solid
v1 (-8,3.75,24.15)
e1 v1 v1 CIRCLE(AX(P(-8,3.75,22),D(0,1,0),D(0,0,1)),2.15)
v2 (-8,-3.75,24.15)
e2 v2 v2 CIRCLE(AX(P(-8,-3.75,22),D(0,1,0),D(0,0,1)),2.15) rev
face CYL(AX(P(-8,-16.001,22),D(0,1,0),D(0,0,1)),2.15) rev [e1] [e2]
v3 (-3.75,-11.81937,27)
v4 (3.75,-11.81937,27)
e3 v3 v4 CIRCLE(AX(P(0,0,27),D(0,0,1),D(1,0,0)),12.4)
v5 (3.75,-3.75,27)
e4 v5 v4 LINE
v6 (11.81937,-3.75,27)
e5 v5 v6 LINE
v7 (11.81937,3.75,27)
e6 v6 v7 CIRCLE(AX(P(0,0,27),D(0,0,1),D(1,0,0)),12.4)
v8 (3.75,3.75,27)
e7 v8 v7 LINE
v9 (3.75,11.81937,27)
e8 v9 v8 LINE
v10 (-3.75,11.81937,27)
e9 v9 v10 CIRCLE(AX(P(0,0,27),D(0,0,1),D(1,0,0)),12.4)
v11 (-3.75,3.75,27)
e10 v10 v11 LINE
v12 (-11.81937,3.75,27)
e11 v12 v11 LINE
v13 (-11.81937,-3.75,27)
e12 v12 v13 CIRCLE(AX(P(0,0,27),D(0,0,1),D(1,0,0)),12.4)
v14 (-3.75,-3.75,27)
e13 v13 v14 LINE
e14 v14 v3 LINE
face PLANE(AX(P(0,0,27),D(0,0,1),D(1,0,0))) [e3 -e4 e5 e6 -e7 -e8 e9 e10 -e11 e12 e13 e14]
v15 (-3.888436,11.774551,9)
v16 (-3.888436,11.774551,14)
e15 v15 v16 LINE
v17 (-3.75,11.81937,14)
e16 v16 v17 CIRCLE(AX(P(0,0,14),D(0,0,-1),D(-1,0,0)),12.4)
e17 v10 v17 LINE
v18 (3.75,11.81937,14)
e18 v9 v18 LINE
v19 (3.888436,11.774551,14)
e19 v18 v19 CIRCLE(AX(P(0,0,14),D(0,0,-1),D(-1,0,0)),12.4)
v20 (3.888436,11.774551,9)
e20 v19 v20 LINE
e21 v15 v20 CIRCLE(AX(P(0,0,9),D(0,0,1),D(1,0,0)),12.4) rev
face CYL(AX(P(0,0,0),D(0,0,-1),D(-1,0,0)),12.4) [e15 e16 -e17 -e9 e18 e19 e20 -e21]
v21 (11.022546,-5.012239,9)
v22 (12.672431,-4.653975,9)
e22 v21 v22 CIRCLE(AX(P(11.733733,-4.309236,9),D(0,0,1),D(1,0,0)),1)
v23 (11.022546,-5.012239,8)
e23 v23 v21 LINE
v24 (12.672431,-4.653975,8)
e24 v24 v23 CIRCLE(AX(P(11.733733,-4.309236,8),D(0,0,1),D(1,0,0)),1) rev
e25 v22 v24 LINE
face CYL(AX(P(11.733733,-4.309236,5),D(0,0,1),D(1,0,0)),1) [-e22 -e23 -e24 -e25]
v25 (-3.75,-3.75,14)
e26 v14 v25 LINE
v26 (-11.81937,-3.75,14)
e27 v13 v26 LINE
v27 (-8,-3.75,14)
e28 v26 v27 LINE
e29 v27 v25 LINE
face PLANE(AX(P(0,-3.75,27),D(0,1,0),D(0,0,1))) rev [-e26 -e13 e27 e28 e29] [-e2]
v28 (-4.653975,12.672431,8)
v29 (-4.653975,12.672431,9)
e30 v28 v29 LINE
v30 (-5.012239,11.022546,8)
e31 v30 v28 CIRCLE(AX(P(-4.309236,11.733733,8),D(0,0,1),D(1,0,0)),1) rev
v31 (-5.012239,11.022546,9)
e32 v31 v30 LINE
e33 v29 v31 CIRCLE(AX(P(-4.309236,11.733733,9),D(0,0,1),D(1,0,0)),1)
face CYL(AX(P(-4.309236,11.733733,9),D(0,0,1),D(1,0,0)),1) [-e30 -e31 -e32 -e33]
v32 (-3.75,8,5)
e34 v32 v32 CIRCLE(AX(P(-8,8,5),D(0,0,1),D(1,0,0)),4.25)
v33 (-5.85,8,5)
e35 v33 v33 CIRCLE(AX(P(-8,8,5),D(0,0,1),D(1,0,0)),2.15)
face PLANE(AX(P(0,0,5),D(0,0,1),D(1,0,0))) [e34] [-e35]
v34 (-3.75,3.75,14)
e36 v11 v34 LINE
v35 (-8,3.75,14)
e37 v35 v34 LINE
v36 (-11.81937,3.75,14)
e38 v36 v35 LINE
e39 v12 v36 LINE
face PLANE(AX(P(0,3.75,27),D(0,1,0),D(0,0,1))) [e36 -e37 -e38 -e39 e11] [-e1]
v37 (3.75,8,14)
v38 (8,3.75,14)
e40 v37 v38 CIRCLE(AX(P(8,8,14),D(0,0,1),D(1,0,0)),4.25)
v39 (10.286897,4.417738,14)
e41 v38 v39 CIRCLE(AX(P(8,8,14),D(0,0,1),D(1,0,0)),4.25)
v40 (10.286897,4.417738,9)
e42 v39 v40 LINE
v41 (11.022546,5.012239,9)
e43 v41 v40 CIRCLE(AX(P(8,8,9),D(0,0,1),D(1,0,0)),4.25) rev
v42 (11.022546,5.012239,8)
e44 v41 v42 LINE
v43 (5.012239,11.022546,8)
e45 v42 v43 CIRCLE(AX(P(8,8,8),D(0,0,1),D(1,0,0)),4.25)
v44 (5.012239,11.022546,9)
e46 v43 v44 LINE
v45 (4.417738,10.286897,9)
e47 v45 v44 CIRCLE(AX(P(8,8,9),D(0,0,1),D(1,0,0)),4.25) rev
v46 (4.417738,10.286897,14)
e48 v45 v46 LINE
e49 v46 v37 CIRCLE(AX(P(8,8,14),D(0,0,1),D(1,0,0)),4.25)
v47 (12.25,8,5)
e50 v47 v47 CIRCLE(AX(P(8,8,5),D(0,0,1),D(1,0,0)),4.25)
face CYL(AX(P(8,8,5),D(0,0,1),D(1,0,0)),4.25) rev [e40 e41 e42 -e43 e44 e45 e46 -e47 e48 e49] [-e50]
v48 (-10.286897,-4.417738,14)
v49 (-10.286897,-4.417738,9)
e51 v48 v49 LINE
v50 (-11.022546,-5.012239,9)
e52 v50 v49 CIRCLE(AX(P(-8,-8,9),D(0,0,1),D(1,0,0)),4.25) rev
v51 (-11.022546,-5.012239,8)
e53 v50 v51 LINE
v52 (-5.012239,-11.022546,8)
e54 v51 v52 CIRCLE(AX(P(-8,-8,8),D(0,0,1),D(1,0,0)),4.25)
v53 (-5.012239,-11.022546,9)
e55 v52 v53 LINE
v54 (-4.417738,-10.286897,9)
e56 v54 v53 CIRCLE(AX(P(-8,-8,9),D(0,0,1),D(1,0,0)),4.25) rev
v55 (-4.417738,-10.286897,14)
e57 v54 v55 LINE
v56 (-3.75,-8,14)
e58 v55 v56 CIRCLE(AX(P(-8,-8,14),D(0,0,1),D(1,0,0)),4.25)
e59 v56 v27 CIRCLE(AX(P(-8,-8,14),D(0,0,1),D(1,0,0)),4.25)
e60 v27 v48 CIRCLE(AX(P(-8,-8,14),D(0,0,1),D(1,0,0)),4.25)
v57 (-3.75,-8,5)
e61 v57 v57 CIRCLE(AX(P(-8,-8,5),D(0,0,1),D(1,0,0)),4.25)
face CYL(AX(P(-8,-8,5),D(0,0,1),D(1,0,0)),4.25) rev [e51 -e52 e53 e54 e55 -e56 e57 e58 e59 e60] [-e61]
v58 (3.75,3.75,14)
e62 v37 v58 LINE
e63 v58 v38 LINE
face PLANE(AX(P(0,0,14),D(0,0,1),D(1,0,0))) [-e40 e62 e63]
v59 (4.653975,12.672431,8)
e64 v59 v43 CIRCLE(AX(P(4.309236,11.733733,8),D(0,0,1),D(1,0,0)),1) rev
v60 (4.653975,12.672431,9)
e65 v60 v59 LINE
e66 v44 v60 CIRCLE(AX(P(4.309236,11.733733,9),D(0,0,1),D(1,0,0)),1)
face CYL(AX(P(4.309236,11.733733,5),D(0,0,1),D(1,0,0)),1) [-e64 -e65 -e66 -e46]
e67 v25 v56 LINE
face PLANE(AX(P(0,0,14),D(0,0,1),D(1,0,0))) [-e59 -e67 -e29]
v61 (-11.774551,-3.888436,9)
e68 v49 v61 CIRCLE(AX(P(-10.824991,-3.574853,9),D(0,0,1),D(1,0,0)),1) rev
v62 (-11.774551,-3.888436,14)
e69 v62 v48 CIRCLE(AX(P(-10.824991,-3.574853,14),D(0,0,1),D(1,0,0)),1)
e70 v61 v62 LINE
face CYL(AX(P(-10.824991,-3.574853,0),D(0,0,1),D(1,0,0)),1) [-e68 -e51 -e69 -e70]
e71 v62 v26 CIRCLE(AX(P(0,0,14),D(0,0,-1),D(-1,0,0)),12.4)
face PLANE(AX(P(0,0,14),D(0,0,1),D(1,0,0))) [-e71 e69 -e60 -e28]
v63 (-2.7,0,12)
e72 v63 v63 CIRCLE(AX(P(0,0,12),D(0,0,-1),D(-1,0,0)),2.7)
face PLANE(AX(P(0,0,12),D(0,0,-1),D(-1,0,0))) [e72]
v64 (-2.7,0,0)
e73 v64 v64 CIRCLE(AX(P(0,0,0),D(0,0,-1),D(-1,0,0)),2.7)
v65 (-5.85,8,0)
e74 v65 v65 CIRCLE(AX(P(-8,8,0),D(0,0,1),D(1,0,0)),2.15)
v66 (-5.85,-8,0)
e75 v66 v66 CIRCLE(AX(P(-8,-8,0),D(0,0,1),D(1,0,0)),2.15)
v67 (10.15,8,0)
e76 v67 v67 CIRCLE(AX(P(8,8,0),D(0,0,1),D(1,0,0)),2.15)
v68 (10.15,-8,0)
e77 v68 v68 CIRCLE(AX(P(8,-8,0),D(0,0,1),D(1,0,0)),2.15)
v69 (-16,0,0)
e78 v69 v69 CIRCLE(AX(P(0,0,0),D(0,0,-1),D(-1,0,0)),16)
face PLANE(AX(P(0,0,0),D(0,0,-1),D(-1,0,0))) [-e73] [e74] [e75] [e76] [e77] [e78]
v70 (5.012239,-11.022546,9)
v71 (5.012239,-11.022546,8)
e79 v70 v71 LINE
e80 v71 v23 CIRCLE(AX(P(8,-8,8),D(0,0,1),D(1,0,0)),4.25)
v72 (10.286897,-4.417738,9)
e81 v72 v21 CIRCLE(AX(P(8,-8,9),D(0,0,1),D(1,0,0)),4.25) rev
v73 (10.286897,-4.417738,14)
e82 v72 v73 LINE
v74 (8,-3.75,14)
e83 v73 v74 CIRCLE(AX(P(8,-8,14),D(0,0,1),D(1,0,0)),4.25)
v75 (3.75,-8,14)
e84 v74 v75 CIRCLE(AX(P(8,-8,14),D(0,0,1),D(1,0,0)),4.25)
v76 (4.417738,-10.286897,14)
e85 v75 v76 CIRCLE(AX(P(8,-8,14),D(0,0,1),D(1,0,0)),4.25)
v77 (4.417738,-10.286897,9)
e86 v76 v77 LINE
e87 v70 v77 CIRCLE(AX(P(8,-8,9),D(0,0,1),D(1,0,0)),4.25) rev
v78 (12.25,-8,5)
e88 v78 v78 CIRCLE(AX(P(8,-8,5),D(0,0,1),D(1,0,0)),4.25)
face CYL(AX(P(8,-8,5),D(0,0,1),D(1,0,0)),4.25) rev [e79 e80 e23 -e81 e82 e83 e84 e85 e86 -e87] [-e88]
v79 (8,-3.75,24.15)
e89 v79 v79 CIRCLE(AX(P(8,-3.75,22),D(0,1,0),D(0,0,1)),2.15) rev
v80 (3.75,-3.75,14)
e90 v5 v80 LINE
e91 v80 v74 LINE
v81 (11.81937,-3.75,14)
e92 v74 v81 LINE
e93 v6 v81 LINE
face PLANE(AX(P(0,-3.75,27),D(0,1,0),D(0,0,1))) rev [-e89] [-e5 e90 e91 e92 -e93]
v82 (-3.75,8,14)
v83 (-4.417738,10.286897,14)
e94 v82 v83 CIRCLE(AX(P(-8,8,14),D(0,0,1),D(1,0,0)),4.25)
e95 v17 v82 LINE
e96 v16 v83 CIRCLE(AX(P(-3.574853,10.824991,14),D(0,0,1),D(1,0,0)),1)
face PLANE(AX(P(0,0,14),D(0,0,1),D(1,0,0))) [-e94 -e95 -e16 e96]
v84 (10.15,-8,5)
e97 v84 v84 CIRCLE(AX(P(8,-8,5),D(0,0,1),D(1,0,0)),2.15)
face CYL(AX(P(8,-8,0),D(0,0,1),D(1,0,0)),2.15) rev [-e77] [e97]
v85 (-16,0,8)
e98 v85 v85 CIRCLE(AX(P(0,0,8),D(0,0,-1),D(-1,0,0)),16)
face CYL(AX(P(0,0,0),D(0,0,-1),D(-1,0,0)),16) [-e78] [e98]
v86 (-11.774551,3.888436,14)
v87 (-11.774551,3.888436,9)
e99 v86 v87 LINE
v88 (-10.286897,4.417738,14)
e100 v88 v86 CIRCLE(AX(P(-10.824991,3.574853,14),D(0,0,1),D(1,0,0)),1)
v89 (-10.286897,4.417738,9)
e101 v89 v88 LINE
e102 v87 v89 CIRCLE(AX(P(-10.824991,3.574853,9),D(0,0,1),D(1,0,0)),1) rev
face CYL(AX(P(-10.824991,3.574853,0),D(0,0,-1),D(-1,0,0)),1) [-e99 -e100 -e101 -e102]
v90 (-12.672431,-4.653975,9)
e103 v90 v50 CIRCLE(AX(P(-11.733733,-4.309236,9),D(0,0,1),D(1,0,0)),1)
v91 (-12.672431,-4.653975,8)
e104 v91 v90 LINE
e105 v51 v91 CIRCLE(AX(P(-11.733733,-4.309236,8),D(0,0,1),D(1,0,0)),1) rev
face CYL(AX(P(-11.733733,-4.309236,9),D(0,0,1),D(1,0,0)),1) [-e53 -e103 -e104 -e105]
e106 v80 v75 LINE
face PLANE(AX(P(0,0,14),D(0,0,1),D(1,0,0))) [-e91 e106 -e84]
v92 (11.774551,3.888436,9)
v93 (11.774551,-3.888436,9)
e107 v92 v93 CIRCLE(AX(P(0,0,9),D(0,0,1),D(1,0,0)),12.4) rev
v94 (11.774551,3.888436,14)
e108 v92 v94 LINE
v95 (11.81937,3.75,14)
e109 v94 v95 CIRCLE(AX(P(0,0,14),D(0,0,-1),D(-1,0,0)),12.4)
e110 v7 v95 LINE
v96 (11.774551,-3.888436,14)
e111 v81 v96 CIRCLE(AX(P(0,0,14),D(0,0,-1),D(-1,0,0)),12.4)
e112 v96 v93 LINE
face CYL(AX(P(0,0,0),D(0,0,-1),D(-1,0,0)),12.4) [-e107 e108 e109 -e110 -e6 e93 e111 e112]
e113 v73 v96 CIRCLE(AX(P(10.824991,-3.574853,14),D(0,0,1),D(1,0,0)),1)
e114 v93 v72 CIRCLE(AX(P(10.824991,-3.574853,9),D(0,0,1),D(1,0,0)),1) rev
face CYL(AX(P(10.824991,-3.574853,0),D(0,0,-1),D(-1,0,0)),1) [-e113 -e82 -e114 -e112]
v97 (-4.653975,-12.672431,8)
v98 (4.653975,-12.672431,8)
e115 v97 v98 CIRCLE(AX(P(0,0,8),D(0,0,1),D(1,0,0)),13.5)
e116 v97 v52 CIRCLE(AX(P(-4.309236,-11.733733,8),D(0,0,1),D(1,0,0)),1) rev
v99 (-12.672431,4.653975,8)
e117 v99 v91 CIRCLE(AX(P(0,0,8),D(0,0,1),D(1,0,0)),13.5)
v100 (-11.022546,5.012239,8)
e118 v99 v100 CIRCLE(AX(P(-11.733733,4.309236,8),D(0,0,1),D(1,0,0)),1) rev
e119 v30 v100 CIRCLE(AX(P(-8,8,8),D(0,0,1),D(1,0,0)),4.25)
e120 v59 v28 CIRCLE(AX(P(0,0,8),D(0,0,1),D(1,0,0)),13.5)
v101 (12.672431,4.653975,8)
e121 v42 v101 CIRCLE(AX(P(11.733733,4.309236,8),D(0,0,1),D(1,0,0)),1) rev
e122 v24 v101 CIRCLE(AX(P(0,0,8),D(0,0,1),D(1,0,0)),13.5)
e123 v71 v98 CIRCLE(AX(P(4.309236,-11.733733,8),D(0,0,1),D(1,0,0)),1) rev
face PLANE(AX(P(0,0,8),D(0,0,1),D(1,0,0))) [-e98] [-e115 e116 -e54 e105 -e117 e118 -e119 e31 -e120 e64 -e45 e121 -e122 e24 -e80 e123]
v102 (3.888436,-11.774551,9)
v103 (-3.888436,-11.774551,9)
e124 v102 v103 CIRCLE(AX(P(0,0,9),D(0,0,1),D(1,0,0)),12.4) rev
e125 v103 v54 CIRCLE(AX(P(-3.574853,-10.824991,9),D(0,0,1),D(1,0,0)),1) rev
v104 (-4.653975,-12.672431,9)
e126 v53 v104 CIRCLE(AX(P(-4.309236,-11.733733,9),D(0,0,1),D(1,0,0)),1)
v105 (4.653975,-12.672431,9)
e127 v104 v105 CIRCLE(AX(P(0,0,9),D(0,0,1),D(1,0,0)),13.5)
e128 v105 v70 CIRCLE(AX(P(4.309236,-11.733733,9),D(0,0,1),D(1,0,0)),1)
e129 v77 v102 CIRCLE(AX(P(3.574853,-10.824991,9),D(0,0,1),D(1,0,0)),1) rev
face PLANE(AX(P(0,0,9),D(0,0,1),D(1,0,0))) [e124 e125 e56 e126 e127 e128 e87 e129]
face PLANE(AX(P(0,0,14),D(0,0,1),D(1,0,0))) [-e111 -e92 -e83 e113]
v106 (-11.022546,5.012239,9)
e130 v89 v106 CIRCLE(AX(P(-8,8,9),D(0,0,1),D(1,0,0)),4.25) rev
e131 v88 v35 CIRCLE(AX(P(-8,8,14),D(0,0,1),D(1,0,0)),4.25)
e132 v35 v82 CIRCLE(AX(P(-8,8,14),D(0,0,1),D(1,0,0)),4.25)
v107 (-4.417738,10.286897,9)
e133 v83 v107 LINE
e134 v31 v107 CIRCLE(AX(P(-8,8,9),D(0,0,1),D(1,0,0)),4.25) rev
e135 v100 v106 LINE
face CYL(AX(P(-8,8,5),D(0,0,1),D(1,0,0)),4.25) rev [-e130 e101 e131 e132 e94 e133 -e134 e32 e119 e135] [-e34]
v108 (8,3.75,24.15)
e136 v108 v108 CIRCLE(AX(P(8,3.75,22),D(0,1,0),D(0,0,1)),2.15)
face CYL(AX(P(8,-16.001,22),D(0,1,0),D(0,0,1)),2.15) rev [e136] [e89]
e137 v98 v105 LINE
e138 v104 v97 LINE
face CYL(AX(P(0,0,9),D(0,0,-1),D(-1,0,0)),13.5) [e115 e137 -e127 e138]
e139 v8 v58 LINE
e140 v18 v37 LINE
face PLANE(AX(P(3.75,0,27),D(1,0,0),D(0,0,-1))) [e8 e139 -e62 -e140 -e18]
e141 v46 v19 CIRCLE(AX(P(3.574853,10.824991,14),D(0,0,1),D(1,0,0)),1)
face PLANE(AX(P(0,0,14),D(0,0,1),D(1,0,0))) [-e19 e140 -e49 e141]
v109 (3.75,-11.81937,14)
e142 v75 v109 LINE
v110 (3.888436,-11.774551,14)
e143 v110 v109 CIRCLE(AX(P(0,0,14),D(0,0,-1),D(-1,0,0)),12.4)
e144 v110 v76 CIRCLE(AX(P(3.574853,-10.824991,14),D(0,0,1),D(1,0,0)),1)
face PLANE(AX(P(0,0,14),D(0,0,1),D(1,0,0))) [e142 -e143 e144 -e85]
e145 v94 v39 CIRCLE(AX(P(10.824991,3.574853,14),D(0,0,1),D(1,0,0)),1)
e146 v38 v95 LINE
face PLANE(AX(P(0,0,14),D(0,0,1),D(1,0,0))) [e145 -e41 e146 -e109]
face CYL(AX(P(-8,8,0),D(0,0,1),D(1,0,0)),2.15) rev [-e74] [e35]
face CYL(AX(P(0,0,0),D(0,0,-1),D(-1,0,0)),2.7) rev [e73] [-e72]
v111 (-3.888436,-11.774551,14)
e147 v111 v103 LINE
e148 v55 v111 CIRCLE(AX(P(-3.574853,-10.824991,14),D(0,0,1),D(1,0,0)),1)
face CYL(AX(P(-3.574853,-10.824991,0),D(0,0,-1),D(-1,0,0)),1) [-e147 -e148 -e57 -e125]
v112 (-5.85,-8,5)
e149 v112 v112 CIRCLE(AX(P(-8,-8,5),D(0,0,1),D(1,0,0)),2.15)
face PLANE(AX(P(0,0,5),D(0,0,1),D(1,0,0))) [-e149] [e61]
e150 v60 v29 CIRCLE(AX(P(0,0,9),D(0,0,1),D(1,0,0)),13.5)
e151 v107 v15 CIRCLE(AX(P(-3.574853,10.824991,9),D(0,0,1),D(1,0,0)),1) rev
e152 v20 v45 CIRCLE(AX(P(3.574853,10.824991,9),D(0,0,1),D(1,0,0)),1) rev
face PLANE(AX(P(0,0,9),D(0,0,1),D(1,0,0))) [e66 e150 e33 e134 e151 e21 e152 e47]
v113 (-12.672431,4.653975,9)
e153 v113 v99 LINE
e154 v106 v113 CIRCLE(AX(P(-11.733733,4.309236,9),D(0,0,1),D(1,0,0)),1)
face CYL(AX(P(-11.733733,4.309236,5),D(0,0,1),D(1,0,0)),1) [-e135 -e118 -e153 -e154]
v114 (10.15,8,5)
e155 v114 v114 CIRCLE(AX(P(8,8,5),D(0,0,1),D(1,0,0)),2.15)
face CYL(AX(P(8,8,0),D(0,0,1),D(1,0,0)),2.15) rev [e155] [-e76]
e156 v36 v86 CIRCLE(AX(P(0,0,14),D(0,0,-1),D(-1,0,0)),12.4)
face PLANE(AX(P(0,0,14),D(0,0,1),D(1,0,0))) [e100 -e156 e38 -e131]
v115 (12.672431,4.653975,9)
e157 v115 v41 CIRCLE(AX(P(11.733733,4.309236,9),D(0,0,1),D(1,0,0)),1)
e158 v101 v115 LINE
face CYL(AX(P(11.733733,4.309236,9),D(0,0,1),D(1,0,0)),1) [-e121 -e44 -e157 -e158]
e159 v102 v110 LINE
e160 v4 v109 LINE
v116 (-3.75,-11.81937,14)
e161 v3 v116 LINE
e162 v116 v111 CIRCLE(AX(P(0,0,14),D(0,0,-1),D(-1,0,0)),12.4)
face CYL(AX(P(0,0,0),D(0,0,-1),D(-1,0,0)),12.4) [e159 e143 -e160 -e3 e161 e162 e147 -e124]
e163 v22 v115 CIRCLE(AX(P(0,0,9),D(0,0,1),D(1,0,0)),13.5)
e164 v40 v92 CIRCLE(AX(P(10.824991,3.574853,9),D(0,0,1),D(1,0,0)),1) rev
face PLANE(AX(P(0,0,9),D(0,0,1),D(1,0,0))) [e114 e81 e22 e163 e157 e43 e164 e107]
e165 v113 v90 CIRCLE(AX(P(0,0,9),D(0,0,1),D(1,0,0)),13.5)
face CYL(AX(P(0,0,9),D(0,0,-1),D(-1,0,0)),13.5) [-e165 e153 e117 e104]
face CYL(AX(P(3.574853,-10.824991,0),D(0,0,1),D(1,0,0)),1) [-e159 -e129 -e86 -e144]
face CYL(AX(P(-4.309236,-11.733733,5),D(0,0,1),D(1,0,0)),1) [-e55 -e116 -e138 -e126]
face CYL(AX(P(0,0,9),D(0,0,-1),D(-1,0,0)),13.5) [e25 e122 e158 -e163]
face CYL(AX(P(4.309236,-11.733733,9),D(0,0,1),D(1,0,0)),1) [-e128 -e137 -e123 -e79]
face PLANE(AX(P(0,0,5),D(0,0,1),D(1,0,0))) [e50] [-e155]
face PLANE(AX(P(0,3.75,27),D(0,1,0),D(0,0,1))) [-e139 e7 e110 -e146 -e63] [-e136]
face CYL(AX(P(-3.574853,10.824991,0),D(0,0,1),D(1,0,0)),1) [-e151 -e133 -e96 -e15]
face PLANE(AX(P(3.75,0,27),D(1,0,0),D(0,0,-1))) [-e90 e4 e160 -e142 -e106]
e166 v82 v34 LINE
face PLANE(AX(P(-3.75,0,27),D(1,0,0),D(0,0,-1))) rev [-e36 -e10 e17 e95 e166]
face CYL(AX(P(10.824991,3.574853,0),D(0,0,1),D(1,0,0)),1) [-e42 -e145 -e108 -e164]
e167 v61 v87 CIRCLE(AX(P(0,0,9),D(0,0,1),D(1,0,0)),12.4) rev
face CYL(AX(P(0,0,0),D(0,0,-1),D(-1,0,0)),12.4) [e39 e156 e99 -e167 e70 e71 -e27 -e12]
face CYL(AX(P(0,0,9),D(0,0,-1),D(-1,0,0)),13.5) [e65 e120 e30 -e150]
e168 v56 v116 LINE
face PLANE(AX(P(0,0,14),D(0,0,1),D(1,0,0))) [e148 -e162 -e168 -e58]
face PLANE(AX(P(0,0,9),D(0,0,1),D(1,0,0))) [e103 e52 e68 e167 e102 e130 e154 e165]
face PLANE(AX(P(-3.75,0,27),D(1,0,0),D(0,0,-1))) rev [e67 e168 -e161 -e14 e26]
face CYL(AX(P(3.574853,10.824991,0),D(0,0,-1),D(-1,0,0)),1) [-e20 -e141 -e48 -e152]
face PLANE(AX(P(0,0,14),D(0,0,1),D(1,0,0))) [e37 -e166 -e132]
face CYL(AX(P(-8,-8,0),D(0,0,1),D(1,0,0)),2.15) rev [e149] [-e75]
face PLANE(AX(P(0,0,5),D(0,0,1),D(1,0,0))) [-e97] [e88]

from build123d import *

# Parameters (mm, degrees)
SKETCH1_W               = 2.7
SKETCH1_H               = 2
CUT_EXTRUDE1_DEPTH      = 25
CUT_EXTRUDE1_DEPTH_BACK = 25
SKETCH2_R               = 2.15
CUT_EXTRUDE3_DEPTH      = 25
CUT_EXTRUDE3_DEPTH_BACK = 3
SKETCH2_4_R             = 4.25
BOSS_EXTRUDE1_DEPTH     = 1
SKETCH4_W               = 7.5
SKETCH4_H               = 7.5
BOSS_EXTRUDE2_DEPTH     = 13
FILLET1_START           = 9
FILLET1_DEPTH           = 5
FILLET2_R               = 1
CUT_EXTRUDE4_REACH      = 39.082
SKETCH5_R               = 2.15


with BuildPart() as part:
    # Sketch1 → Revolve1 (revolve)
    with BuildSketch(Plane(origin=(0, 0, 0), x_dir=(1, 0, 0), z_dir=(0, 1, 0)), mode=Mode.PRIVATE) as revolve1_sk:
        Polygon((16, 0), (2.7, 0), (2.7, -12), (2.7, -14), (12.4, -14), (12.4, -8), (16, -8), align=None)
        with Locations((1.35, -13)):
            Rectangle(SKETCH1_W, SKETCH1_H)
    revolve(revolve1_sk.sketch.rotate(Axis((0, 0, 0), (0, 0, 1)), 180), axis=Axis((0, 0, 0), (0, 0, 1)))

    # Sketch2 → Cut-Extrude1 (cut, two sides: drawn at the far end of the back side and taken through both)
    with BuildSketch(Plane.XY.offset(8).offset(-CUT_EXTRUDE1_DEPTH_BACK)):
        with Locations((-8, 8)):
            Circle(SKETCH2_R)
        with Locations((8, 8)):
            Circle(SKETCH2_R)
        with Locations((8, -8)):
            Circle(SKETCH2_R)
        with Locations((-8, -8)):
            Circle(SKETCH2_R)
    extrude(amount=CUT_EXTRUDE1_DEPTH + CUT_EXTRUDE1_DEPTH_BACK, mode=Mode.SUBTRACT)

    # Sketch2<4> → Cut-Extrude3 (cut, two sides: drawn at the far end of the back side and taken through both)
    with BuildSketch(Plane.XY.offset(8).offset(-CUT_EXTRUDE3_DEPTH_BACK)):
        with Locations((-8, 8)):
            Circle(SKETCH2_4_R)
        with Locations((8, 8)):
            Circle(SKETCH2_4_R)
        with Locations((8, -8)):
            Circle(SKETCH2_4_R)
        with Locations((-8, -8)):
            Circle(SKETCH2_4_R)
    extrude(amount=CUT_EXTRUDE3_DEPTH + CUT_EXTRUDE3_DEPTH_BACK, mode=Mode.SUBTRACT)

    # Sketch3 → Boss-Extrude1 (add)
    with BuildSketch(Plane.XY.offset(8)):
        with BuildLine():
            ThreePointArc((5.244985625, 11.236108125), (5.769768323, 11.617812415), (6.346544904, 11.915173846))
            ThreePointArc((6.346544904, 11.915173846), (0, 13.5), (-6.346544904, 11.915173846))
            ThreePointArc((-6.346544904, 11.915173846), (-5.769768323, 11.617812415), (-5.244985625, 11.236108125))
            ThreePointArc((-5.244985625, 11.236108125), (0, 12.4), (5.244985625, 11.236108125))
        make_face()
        with BuildLine():
            ThreePointArc((-11.236108125, 5.244985625), (-11.617812415, 5.769768323), (-11.915173846, 6.346544904))
            ThreePointArc((-11.915173846, 6.346544904), (-13.5, 0), (-11.915173846, -6.346544904))
            ThreePointArc((-11.915173846, -6.346544904), (-11.617812415, -5.769768323), (-11.236108125, -5.244985625))
            ThreePointArc((-11.236108125, -5.244985625), (-12.4, 0), (-11.236108125, 5.244985625))
        make_face()
        with BuildLine():
            ThreePointArc((-6.346544904, -11.915173846), (0, -13.5), (6.346544904, -11.915173846))
            ThreePointArc((6.346544904, -11.915173846), (5.769768323, -11.617812415), (5.244985625, -11.236108125))
            ThreePointArc((5.244985625, -11.236108125), (0, -12.4), (-5.244985625, -11.236108125))
            ThreePointArc((-5.244985625, -11.236108125), (-5.769768323, -11.617812415), (-6.346544904, -11.915173846))
        make_face()
        with BuildLine():
            ThreePointArc((11.915173846, -6.346544904), (13.097802238, -3.270714989), (13.5, 0))
            ThreePointArc((13.5, 0), (13.097802238, 3.270714989), (11.915173846, 6.346544904))
            ThreePointArc((11.915173846, 6.346544904), (11.617812415, 5.769768323), (11.236108125, 5.244985625))
            ThreePointArc((11.236108125, 5.244985625), (12.4, 0), (11.236108125, -5.244985625))
            ThreePointArc((11.236108125, -5.244985625), (11.617812415, -5.769768323), (11.915173846, -6.346544904))
        make_face()
    extrude(amount=BOSS_EXTRUDE1_DEPTH)

    # Sketch4 → Boss-Extrude2 (add)
    with BuildSketch(Plane.XY.offset(14)):
        with BuildLine():
            Line((-3.75, 11.819369696), (-3.75, 3.75))
            Line((-3.75, 3.75), (3.75, 3.75))
            Line((3.75, 3.75), (3.75, 11.819369696))
            ThreePointArc((3.75, 11.819369696), (0, 12.4), (-3.75, 11.819369696))
        make_face()
        Rectangle(SKETCH4_W, SKETCH4_H)
        with BuildLine():
            Line((-3.75, 3.75), (-11.819369696, 3.75))
            ThreePointArc((-11.819369696, 3.75), (-12.4, 0), (-11.819369696, -3.75))
            Line((-11.819369696, -3.75), (-3.75, -3.75))
            Line((-3.75, -3.75), (-3.75, 3.75))
        make_face()
        with BuildLine():
            Line((3.75, -3.75), (-3.75, -3.75))
            Line((-3.75, -3.75), (-3.75, -11.819369696))
            ThreePointArc((-3.75, -11.819369696), (0, -12.4), (3.75, -11.819369696))
            Line((3.75, -11.819369696), (3.75, -3.75))
        make_face()
        with BuildLine():
            Line((11.819369696, 3.75), (3.75, 3.75))
            Line((3.75, 3.75), (3.75, -3.75))
            Line((3.75, -3.75), (11.819369696, -3.75))
            ThreePointArc((11.819369696, -3.75), (12.253982704, -1.897342322), (12.4, 0))
            ThreePointArc((12.4, 0), (12.253982704, 1.897342322), (11.819369696, 3.75))
        make_face()
    extrude(amount=BOSS_EXTRUDE2_DEPTH)

    # Fillet1: read off the stored shape, not the designer's step
    # Fillet1 outline → Fillet1 (cut)
    with BuildSketch(Plane.XY.offset(FILLET1_START)):
        with BuildLine():
            ThreePointArc((-10.286897346, -4.417738071), (-11.160201718, -4.516996035), (-11.774551439, -3.8884365))
            ThreePointArc((-11.774551439, -3.8884365), (-11.525305626, -4.574639902), (-11.236108125, -5.244985625))
            ThreePointArc((-11.236108125, -5.244985625), (-10.792307645, -4.796015291), (-10.286897346, -4.417738071))
        make_face()
        with BuildLine():
            ThreePointArc((-11.236108125, 5.244985625), (-11.525305626, 4.574639902), (-11.774551439, 3.8884365))
            ThreePointArc((-11.774551439, 3.8884365), (-11.160201718, 4.516996035), (-10.286897346, 4.417738071))
            ThreePointArc((-10.286897346, 4.417738071), (-10.792307645, 4.796015291), (-11.236108125, 5.244985625))
        make_face()
        with BuildLine():
            ThreePointArc((-4.417738071, -10.286897346), (-4.796015291, -10.792307645), (-5.244985625, -11.236108125))
            ThreePointArc((-5.244985625, -11.236108125), (-4.574639902, -11.525305626), (-3.8884365, -11.774551439))
            ThreePointArc((-3.8884365, -11.774551439), (-4.516996035, -11.160201718), (-4.417738071, -10.286897346))
        make_face()
        with BuildLine():
            ThreePointArc((-3.8884365, 11.774551439), (-4.574639902, 11.525305626), (-5.244985625, 11.236108125))
            ThreePointArc((-5.244985625, 11.236108125), (-4.796015291, 10.792307645), (-4.417738071, 10.286897346))
            ThreePointArc((-4.417738071, 10.286897346), (-4.516996035, 11.160201718), (-3.8884365, 11.774551439))
        make_face()
        with BuildLine():
            ThreePointArc((4.417738071, -10.286897346), (4.516996035, -11.160201718), (3.8884365, -11.774551439))
            ThreePointArc((3.8884365, -11.774551439), (4.574639902, -11.525305626), (5.244985625, -11.236108125))
            ThreePointArc((5.244985625, -11.236108125), (4.796015291, -10.792307645), (4.417738071, -10.286897346))
        make_face()
        with BuildLine():
            ThreePointArc((5.244985625, 11.236108125), (4.574639902, 11.525305626), (3.8884365, 11.774551439))
            ThreePointArc((3.8884365, 11.774551439), (4.516996035, 11.160201718), (4.417738071, 10.286897346))
            ThreePointArc((4.417738071, 10.286897346), (4.796015291, 10.792307645), (5.244985625, 11.236108125))
        make_face()
        with BuildLine():
            ThreePointArc((11.774551439, -3.8884365), (11.160201718, -4.516996035), (10.286897346, -4.417738071))
            ThreePointArc((10.286897346, -4.417738071), (10.792307645, -4.796015291), (11.236108125, -5.244985625))
            ThreePointArc((11.236108125, -5.244985625), (11.525305626, -4.574639902), (11.774551439, -3.8884365))
        make_face()
        with BuildLine():
            ThreePointArc((11.236108125, 5.244985625), (10.792307645, 4.796015291), (10.286897346, 4.417738071))
            ThreePointArc((10.286897346, 4.417738071), (11.160201718, 4.516996035), (11.774551439, 3.8884365))
            ThreePointArc((11.774551439, 3.8884365), (11.525305626, 4.574639902), (11.236108125, 5.244985625))
        make_face()
    extrude(amount=FILLET1_DEPTH, mode=Mode.SUBTRACT)

    # Fillet2
    # the kernel refuses this fillet: 1 mm, written as the material it takes off along each edge
    with BuildSketch(Plane(origin=(6.346544904, 11.915173846, 8), x_dir=(-0.9128071588111344, 0.4083908554597477, 0), z_dir=(0, 0, 1)), Plane(origin=(-11.915173846, 6.346544904, 8), x_dir=(-0.4083908554599063, -0.9128071588110634, 0), z_dir=(0, 0, 1)), Plane(origin=(-6.346544904, -11.915173846, 8), x_dir=(0.9128071588110586, -0.408390855459917, 0), z_dir=(0, 0, 1)), Plane(origin=(11.915173846, -6.346544904, 8), x_dir=(0.4083908554598645, 0.9128071588110821, 0), z_dir=(0, 0, 1))) as fillet2_piece_1:
        with BuildLine():
            CenterArc((1.785571343, 0.997639029), FILLET2_R, 158.772199303, 115.165734994)
            ThreePointArc((0.853423117, 1.359715932), (0.491495222, 0.639196623), (0, 0))
            ThreePointArc((0, 0), (0.927123582, -0.031873112), (1.854247164, 0))
        make_face()
    extrude(amount=5.63561791, mode=Mode.SUBTRACT)
    with BuildSketch(Plane(origin=(-6.346544904, 11.915173846, 8), x_dir=(0.9128071588110631, 0.4083908554599068, 0), z_dir=(0, 0, 1)), Plane(origin=(-11.915173846, -6.346544904, 8), x_dir=(-0.4083908554599002, 0.912807158811066, 0), z_dir=(0, 0, 1)), Plane(origin=(6.346544904, -11.915173846, 8), x_dir=(-0.9128071588111399, -0.40839085545973536, 0), z_dir=(0, 0, 1)), Plane(origin=(11.915173846, 6.346544904, 8), x_dir=(0.40839085545986265, -0.912807158811083, 0), z_dir=(0, 0, 1))) as fillet2_piece_2:
        with BuildLine():
            CenterArc((1.785571343, -0.997639029), FILLET2_R, 86.062065704, 115.165734994)
            ThreePointArc((0.853423117, -1.359715932), (0.491495222, -0.639196623), (0, 0))
            ThreePointArc((0, 0), (0.927123582, 0.031873112), (1.854247164, 0))
        make_face()
    extrude(amount=5.63561791, mode=Mode.SUBTRACT)

    # Sketch5 → Cut-Extrude4 (cut, up to next)
    with BuildSketch(Plane(origin=(0, 3.75, 0), x_dir=(1, 0, 0), z_dir=(0, 1, 0)), mode=Mode.PRIVATE) as cut_extrude4_sk1:
        with Locations(Location((-8, -22, 0), (0, 0, 270))):
            Circle(SKETCH5_R)
    cut_extrude4_tool1 = extrude(cut_extrude4_sk1.sketch, amount=-CUT_EXTRUDE4_REACH, mode=Mode.PRIVATE) & part.part
    # Sketch5 → Cut-Extrude4 (cut, up to next)
    with BuildSketch(Plane(origin=(0, 3.75, 0), x_dir=(1, 0, 0), z_dir=(0, 1, 0)), mode=Mode.PRIVATE) as cut_extrude4_sk2:
        with Locations(Location((8, -22, 0), (0, 0, 270))):
            Circle(SKETCH5_R)
    cut_extrude4_tool2 = extrude(cut_extrude4_sk2.sketch, amount=-CUT_EXTRUDE4_REACH, mode=Mode.PRIVATE) & part.part
    add(cut_extrude4_tool1.solids().sort_by_distance((-8, 3.75, 22))[0], mode=Mode.SUBTRACT)
    add(cut_extrude4_tool2.solids().sort_by_distance((8, 3.75, 22))[0], mode=Mode.SUBTRACT)


solid = part.part
